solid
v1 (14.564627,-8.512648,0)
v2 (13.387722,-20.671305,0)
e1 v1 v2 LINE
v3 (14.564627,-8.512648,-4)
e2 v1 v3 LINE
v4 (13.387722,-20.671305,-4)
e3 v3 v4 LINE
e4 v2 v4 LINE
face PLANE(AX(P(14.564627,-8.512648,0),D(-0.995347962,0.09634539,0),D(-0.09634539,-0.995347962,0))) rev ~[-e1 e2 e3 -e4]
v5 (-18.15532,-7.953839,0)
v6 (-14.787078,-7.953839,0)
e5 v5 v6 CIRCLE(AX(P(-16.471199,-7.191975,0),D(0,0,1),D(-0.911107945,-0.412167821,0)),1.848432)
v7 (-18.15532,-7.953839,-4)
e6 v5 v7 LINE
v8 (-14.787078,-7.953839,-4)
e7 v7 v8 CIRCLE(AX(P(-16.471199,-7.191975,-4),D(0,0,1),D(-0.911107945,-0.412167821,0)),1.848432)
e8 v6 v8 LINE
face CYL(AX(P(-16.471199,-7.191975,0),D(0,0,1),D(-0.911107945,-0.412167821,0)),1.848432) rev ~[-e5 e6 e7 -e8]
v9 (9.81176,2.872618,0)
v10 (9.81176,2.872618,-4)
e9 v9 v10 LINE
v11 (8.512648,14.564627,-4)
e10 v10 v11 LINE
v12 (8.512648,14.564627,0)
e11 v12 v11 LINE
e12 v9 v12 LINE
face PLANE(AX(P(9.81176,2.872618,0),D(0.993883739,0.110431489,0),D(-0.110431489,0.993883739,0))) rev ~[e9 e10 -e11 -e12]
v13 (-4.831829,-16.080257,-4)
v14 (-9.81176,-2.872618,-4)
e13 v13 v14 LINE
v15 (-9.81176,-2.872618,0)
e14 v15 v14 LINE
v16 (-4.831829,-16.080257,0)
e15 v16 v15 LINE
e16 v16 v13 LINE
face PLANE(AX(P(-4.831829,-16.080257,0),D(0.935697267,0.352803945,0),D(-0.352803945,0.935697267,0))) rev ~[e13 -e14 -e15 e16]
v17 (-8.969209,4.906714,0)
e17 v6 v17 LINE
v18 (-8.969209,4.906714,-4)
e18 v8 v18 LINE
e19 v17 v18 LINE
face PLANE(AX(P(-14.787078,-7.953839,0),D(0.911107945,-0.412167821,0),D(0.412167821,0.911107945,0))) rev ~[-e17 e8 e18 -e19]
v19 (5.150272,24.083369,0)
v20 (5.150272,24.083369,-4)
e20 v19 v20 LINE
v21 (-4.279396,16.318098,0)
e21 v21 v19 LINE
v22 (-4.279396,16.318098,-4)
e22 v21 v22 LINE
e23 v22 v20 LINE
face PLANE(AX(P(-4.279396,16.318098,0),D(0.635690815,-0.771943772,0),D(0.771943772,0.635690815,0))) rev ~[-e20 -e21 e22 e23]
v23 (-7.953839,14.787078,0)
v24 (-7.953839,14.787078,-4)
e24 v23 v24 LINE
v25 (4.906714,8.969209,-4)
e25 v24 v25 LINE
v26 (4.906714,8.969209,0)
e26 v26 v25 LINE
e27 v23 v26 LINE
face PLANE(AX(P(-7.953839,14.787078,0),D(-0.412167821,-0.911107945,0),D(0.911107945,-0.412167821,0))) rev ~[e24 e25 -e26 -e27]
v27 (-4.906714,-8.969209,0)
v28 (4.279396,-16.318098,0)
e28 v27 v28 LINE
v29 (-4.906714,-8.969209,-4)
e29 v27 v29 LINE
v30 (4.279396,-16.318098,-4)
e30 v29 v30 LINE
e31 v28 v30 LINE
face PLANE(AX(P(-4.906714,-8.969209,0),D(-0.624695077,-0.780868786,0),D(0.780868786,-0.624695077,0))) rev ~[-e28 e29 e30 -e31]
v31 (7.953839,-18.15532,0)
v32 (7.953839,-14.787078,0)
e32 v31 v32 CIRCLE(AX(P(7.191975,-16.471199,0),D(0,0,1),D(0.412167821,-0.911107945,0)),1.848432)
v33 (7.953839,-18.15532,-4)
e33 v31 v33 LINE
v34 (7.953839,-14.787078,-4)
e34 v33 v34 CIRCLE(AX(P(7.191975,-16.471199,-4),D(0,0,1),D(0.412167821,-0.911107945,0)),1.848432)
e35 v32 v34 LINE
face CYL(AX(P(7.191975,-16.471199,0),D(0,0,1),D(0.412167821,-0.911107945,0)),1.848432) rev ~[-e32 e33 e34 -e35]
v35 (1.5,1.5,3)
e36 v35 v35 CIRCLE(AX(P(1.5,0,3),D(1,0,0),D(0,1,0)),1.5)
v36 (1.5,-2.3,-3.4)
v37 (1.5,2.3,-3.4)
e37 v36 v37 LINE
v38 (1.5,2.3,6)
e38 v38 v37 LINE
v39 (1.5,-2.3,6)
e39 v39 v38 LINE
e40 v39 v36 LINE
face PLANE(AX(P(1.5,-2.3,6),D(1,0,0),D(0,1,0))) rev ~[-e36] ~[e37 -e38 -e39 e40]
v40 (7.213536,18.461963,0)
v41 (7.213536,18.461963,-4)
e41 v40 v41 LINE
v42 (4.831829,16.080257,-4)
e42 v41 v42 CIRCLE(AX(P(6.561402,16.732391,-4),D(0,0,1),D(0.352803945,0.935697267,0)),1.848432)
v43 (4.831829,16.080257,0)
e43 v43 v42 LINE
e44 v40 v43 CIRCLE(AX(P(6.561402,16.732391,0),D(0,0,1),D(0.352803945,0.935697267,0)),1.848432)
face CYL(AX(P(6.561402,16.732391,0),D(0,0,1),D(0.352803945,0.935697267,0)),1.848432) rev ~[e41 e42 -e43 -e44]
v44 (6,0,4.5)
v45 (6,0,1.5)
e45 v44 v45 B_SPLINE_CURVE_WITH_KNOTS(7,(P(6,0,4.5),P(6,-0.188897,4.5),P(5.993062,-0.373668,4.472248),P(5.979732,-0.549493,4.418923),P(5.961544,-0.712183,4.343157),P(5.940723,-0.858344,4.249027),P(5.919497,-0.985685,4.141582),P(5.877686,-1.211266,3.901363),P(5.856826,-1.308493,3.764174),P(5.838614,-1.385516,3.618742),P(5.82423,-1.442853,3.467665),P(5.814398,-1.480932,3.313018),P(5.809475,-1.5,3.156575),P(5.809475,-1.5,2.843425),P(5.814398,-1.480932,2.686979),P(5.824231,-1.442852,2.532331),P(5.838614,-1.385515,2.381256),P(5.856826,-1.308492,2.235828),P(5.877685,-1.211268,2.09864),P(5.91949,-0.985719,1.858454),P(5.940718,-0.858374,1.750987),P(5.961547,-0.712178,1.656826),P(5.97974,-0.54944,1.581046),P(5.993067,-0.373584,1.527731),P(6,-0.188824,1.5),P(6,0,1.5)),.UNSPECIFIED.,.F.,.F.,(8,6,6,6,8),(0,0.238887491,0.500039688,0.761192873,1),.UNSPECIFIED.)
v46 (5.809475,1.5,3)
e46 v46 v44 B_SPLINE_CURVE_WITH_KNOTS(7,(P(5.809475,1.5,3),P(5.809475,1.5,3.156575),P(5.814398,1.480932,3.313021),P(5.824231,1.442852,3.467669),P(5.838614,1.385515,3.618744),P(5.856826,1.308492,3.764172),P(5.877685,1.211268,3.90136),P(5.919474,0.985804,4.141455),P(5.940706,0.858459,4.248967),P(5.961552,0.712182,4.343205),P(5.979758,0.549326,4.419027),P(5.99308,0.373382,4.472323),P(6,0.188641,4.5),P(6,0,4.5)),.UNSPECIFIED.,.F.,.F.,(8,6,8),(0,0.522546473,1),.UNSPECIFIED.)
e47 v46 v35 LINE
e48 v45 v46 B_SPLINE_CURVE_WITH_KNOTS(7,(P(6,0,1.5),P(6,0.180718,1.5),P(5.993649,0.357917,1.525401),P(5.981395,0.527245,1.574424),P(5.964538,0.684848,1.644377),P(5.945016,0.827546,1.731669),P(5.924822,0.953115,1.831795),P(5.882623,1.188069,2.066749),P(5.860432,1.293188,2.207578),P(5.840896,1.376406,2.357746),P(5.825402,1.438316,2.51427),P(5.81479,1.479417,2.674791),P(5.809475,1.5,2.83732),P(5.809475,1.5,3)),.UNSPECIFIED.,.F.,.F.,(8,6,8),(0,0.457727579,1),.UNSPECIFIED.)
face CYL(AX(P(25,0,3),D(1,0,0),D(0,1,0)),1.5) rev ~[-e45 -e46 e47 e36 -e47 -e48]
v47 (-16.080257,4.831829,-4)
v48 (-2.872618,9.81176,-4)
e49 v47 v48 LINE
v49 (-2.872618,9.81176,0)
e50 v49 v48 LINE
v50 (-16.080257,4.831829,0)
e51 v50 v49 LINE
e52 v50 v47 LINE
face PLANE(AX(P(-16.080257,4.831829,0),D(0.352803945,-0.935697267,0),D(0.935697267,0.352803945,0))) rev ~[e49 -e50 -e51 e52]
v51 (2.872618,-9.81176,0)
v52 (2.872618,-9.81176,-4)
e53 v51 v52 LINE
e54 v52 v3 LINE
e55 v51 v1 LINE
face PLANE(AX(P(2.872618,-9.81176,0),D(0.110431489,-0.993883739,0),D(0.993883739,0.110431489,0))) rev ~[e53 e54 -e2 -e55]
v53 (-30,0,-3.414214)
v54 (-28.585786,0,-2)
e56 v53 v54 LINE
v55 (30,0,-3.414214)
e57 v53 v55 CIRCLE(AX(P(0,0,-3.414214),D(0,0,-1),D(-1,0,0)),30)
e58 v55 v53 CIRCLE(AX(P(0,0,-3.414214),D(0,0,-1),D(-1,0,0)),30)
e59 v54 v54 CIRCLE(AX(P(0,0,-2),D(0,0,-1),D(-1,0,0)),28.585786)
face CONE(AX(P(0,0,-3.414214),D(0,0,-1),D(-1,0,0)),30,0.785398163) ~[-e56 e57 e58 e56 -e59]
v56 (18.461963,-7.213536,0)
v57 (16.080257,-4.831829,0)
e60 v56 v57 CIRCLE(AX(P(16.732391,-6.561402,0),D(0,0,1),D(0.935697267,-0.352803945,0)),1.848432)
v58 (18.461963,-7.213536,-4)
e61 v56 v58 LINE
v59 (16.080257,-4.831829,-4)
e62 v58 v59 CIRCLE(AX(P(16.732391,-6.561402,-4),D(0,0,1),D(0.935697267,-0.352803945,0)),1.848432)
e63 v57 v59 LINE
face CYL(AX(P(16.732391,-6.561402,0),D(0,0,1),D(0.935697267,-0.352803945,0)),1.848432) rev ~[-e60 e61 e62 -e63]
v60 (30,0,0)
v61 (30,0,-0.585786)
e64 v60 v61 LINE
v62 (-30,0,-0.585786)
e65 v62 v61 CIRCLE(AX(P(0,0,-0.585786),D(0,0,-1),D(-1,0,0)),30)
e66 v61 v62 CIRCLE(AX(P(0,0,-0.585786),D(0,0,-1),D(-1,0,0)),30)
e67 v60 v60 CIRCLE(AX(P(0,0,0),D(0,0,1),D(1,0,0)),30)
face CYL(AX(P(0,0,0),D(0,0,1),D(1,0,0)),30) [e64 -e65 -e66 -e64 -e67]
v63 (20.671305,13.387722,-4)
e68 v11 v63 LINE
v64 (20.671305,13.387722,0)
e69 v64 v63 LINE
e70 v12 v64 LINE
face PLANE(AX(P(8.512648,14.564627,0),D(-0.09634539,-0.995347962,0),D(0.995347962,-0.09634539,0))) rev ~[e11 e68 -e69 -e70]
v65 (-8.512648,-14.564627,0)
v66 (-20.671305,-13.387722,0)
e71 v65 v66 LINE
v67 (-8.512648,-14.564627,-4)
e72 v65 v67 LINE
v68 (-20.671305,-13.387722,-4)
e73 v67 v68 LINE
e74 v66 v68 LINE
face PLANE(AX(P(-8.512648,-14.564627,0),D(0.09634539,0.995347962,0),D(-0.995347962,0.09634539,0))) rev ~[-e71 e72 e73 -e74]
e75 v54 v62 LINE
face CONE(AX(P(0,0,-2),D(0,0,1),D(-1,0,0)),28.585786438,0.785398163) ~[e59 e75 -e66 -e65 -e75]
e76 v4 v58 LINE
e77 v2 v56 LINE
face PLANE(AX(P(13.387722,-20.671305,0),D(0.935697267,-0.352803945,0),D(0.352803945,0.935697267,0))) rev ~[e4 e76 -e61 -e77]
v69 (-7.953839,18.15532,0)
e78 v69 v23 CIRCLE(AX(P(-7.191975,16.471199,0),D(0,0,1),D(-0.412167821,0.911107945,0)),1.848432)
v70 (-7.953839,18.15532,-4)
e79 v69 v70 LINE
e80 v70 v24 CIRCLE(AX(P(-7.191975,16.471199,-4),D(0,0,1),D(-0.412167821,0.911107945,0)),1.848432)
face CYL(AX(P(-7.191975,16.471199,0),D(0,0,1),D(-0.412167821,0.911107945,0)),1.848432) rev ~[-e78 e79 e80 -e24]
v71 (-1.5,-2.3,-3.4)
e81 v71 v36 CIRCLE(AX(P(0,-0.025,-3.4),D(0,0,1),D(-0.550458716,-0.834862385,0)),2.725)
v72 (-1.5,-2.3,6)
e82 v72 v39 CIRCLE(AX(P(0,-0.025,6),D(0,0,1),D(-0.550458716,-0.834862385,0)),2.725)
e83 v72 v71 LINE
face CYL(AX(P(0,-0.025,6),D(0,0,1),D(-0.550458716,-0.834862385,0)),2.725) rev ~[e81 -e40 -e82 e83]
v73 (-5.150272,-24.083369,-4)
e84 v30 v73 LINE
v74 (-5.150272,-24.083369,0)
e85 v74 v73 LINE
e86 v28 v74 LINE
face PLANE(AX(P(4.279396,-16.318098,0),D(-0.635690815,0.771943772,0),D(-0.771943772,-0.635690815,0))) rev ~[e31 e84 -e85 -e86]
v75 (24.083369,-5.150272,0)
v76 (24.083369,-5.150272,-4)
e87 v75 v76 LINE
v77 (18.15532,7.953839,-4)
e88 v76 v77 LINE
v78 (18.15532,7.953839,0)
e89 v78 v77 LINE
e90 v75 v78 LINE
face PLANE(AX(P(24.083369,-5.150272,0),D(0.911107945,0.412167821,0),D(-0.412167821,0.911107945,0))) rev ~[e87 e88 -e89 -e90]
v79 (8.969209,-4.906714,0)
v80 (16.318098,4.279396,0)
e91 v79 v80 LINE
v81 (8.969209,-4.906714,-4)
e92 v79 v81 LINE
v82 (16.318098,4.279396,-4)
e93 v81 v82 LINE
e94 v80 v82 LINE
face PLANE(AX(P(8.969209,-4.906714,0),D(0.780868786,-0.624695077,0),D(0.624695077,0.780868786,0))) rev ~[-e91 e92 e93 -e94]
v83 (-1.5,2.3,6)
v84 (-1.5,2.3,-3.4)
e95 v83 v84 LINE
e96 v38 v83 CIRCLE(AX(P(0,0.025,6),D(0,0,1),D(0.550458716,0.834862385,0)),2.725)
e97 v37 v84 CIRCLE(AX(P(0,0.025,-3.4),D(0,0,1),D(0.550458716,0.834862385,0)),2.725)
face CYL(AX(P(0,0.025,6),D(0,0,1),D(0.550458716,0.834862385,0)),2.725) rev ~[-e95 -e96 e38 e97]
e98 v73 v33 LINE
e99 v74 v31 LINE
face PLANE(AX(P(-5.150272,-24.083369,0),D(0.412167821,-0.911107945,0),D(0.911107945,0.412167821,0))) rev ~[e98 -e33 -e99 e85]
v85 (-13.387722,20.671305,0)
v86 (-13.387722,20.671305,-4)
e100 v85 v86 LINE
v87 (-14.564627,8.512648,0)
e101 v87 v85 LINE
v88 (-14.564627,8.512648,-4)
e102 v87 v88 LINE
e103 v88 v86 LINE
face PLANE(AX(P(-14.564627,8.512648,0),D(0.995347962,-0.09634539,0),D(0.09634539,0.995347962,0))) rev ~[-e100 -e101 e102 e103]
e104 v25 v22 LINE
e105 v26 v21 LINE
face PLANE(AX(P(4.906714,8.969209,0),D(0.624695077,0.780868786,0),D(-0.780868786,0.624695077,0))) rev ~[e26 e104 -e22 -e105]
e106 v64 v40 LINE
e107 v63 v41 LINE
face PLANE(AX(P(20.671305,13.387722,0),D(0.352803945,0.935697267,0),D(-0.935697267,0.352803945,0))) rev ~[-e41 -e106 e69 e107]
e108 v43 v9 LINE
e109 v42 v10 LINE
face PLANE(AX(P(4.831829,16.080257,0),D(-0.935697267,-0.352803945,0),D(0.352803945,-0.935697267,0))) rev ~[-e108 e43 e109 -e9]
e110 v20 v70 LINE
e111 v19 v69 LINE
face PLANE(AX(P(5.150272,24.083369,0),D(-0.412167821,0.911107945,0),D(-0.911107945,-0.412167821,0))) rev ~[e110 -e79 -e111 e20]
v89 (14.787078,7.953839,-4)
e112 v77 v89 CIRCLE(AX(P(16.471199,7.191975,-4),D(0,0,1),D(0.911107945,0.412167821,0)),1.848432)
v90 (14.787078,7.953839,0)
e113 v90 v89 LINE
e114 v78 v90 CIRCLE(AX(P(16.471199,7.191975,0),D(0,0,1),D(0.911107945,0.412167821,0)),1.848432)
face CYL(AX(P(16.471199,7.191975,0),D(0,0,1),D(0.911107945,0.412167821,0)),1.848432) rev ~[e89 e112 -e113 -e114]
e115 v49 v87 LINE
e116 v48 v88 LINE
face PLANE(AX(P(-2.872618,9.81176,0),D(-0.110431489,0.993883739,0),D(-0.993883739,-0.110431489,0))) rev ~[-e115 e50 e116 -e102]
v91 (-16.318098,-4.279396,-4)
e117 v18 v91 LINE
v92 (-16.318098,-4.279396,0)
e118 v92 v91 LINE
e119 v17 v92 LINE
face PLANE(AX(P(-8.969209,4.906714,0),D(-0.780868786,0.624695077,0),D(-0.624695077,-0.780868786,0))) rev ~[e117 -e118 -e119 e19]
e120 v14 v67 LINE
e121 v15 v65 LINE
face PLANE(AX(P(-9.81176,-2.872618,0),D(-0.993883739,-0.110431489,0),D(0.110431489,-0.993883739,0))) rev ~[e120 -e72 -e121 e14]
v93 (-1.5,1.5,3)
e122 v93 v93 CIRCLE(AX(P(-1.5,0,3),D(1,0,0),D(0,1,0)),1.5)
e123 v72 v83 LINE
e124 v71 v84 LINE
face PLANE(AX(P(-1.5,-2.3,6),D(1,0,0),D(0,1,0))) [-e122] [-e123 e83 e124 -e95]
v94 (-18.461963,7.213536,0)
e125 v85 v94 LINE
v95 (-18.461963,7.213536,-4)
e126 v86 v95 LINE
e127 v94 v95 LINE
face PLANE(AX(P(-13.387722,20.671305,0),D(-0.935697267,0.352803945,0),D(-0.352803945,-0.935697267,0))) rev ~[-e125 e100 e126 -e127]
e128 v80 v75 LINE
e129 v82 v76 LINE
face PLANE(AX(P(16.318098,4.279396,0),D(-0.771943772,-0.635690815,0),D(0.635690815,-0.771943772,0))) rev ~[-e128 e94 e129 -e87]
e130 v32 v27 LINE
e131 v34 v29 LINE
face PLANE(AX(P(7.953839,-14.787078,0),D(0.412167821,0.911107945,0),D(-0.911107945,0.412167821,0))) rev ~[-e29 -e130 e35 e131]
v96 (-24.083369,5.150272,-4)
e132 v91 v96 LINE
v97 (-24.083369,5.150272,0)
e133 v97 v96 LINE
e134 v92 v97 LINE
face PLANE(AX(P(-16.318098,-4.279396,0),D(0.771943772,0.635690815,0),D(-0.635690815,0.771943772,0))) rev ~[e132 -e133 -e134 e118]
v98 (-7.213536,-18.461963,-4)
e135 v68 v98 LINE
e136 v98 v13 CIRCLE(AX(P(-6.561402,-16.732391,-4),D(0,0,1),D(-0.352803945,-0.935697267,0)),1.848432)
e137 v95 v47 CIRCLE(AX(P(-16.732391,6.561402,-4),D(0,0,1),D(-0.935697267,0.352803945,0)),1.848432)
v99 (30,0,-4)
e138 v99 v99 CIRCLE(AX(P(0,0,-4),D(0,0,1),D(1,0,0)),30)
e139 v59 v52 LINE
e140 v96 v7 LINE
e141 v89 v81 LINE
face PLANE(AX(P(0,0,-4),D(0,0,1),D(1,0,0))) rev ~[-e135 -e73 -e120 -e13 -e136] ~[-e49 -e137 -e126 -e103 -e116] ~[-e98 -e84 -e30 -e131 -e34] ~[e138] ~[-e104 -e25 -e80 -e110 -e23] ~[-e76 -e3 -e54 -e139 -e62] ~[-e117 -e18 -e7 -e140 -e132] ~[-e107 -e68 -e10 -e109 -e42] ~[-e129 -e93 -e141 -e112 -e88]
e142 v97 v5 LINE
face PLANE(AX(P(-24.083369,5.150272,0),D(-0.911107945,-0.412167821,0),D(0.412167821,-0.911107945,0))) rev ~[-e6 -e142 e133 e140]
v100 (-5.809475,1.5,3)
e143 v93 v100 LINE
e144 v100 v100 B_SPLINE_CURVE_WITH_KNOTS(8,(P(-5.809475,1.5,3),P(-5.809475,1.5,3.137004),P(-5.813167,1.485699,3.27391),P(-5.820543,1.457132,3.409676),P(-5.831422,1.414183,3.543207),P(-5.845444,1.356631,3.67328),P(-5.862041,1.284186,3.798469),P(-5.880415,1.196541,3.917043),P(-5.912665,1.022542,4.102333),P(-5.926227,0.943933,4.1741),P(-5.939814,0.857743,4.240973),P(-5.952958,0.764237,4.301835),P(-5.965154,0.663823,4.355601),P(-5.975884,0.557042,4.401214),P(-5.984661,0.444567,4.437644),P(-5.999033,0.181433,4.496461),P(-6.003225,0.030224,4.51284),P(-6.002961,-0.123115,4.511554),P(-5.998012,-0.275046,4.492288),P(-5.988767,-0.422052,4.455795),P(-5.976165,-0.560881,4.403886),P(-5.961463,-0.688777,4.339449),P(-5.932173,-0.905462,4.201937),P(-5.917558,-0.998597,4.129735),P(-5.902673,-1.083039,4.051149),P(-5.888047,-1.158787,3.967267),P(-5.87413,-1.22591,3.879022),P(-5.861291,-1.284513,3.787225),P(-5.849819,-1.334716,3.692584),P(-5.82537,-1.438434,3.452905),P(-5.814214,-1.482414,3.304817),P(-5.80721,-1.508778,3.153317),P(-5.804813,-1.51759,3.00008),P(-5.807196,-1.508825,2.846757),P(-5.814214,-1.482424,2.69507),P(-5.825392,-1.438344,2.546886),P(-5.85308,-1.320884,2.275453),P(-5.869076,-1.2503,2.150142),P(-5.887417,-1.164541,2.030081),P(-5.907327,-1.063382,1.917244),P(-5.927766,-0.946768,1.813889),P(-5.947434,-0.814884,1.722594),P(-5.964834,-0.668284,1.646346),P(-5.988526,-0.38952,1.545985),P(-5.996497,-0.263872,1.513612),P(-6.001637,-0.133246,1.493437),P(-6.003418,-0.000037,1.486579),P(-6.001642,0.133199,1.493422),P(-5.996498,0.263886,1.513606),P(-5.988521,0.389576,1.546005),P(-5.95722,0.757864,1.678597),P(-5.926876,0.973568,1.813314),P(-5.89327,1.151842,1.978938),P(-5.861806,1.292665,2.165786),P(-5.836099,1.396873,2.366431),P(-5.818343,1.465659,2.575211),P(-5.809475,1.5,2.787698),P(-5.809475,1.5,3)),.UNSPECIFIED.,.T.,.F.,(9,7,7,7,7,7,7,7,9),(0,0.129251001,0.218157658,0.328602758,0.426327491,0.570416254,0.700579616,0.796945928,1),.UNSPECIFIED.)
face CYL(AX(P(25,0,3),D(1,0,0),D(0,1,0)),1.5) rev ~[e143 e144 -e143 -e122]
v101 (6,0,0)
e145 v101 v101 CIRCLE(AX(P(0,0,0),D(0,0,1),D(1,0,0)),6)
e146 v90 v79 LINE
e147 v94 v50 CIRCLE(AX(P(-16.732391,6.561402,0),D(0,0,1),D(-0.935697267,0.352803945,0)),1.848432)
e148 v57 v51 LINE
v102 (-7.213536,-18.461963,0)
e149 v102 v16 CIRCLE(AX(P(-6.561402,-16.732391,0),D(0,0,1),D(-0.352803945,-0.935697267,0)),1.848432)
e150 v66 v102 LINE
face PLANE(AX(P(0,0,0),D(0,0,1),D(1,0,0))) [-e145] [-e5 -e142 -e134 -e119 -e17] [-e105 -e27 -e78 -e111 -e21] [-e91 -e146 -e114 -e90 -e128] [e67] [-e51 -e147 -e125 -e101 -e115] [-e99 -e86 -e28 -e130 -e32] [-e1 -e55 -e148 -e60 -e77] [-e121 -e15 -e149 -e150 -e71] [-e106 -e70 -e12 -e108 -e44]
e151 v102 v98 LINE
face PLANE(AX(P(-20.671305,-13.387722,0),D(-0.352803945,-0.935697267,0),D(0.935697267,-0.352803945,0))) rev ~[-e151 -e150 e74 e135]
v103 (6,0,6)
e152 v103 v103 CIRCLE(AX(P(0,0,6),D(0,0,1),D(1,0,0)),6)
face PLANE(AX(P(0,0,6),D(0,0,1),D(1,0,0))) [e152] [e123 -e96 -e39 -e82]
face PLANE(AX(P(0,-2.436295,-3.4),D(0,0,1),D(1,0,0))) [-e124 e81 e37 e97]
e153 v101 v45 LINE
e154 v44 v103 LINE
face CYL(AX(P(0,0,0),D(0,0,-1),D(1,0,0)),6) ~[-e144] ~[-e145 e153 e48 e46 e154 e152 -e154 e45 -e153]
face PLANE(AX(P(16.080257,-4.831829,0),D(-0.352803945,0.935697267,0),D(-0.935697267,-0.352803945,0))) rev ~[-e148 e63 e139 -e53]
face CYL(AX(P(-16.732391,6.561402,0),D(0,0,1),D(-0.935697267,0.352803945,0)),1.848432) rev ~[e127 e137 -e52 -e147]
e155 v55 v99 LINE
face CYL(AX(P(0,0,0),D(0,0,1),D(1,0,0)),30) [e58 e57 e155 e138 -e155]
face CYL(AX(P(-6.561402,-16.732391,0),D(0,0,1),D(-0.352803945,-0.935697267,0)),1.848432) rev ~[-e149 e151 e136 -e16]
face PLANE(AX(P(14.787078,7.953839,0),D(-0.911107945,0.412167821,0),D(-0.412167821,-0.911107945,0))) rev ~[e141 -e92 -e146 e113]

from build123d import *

# Parameters (mm, degrees)
F0_R             = 30
F0_R_2           = 6
F1_DEPTH         = 4
F2_DEPTH         = 6
F3_W             = 3
F3_H             = 4.6
F4_DEPTH         = 9.4
F8_R             = 1.5
F9_DEPTH         = 49.2
F11_DEPTH        = 4
F11_COPIES_COUNT = 8


# Not quite as in the source:
# - a pattern or mirror of a feature is missing from the dataset's text; its kind, count and spacing are read off the source's solid


with BuildPart() as f1:
    # F0 (on Top) → F1 (new body)
    with BuildSketch(Plane.XY):
        Circle(F0_R)
        Circle(F0_R_2, mode=Mode.SUBTRACT)
        Circle(F0_R_2)
    extrude(amount=-F1_DEPTH)

    # F0 (on Top) → F2 (join)
    with BuildSketch(Plane.XY):
        Circle(F0_R_2)
    extrude(amount=F2_DEPTH)

    # F3 (on face) → F4 (cut)
    with BuildSketch(Plane.XY.offset(6)):
        with BuildLine():
            Line((1.5, -2.3), (-1.5, -2.3))
            ThreePointArc((-1.5, -2.3), (0, -2.75), (1.5, -2.3))
        make_face()
        Rectangle(F3_W, F3_H)
        with BuildLine():
            ThreePointArc((1.5, 2.3), (0, 2.75), (-1.5, 2.3))
            Line((-1.5, 2.3), (1.5, 2.3))
        make_face()
    extrude(amount=-F4_DEPTH, mode=Mode.SUBTRACT)

    # F5 (on Front) → F6 (revolve, cut)
    with BuildSketch(Plane.XZ):
        Polygon((-30, -0.5857864376), (-30, -3.4142135624), (-28.5857864376, -2), align=None)
    revolve(axis=Axis((0, 0, -0.1510307193), (0, 0, -1)), mode=Mode.SUBTRACT)

    # F8 (on offset) → F9 (cut)
    with BuildSketch(Plane.YZ.offset(25)):
        with Locations((0, 3)):
            Circle(F8_R)
    extrude(amount=-F9_DEPTH, mode=Mode.SUBTRACT)

    # F10 (on face) → F11 (cut, through all)
    with BuildSketch(Plane.XY):
        with BuildLine():
            Line((-4.2793955654, 16.3180977106), (5.1502715485, 24.0833689493))
            Line((5.1502715485, 24.0833689493), (-7.9538393766, 18.1553196162))
            ThreePointArc((-7.9538393766, 18.1553196162), (-9.040407042, 16.47119876), (-7.9538393766, 14.7870779037))
            Line((-7.9538393766, 14.7870779037), (4.9067144282, 8.9692091569))
            Line((4.9067144282, 8.9692091569), (-4.2793955654, 16.3180977106))
        make_face()
    f11 = extrude(amount=-F11_DEPTH, mode=Mode.SUBTRACT)

    # F11_copies: F11 ×8 about axis
    f11_copies_axis = Axis((0, 0, 0), (0, 0, 1))
    for i in range(1, F11_COPIES_COUNT):
        add(f11.rotate(f11_copies_axis, i * 360 / F11_COPIES_COUNT), mode=Mode.SUBTRACT)


solid = f1.part
